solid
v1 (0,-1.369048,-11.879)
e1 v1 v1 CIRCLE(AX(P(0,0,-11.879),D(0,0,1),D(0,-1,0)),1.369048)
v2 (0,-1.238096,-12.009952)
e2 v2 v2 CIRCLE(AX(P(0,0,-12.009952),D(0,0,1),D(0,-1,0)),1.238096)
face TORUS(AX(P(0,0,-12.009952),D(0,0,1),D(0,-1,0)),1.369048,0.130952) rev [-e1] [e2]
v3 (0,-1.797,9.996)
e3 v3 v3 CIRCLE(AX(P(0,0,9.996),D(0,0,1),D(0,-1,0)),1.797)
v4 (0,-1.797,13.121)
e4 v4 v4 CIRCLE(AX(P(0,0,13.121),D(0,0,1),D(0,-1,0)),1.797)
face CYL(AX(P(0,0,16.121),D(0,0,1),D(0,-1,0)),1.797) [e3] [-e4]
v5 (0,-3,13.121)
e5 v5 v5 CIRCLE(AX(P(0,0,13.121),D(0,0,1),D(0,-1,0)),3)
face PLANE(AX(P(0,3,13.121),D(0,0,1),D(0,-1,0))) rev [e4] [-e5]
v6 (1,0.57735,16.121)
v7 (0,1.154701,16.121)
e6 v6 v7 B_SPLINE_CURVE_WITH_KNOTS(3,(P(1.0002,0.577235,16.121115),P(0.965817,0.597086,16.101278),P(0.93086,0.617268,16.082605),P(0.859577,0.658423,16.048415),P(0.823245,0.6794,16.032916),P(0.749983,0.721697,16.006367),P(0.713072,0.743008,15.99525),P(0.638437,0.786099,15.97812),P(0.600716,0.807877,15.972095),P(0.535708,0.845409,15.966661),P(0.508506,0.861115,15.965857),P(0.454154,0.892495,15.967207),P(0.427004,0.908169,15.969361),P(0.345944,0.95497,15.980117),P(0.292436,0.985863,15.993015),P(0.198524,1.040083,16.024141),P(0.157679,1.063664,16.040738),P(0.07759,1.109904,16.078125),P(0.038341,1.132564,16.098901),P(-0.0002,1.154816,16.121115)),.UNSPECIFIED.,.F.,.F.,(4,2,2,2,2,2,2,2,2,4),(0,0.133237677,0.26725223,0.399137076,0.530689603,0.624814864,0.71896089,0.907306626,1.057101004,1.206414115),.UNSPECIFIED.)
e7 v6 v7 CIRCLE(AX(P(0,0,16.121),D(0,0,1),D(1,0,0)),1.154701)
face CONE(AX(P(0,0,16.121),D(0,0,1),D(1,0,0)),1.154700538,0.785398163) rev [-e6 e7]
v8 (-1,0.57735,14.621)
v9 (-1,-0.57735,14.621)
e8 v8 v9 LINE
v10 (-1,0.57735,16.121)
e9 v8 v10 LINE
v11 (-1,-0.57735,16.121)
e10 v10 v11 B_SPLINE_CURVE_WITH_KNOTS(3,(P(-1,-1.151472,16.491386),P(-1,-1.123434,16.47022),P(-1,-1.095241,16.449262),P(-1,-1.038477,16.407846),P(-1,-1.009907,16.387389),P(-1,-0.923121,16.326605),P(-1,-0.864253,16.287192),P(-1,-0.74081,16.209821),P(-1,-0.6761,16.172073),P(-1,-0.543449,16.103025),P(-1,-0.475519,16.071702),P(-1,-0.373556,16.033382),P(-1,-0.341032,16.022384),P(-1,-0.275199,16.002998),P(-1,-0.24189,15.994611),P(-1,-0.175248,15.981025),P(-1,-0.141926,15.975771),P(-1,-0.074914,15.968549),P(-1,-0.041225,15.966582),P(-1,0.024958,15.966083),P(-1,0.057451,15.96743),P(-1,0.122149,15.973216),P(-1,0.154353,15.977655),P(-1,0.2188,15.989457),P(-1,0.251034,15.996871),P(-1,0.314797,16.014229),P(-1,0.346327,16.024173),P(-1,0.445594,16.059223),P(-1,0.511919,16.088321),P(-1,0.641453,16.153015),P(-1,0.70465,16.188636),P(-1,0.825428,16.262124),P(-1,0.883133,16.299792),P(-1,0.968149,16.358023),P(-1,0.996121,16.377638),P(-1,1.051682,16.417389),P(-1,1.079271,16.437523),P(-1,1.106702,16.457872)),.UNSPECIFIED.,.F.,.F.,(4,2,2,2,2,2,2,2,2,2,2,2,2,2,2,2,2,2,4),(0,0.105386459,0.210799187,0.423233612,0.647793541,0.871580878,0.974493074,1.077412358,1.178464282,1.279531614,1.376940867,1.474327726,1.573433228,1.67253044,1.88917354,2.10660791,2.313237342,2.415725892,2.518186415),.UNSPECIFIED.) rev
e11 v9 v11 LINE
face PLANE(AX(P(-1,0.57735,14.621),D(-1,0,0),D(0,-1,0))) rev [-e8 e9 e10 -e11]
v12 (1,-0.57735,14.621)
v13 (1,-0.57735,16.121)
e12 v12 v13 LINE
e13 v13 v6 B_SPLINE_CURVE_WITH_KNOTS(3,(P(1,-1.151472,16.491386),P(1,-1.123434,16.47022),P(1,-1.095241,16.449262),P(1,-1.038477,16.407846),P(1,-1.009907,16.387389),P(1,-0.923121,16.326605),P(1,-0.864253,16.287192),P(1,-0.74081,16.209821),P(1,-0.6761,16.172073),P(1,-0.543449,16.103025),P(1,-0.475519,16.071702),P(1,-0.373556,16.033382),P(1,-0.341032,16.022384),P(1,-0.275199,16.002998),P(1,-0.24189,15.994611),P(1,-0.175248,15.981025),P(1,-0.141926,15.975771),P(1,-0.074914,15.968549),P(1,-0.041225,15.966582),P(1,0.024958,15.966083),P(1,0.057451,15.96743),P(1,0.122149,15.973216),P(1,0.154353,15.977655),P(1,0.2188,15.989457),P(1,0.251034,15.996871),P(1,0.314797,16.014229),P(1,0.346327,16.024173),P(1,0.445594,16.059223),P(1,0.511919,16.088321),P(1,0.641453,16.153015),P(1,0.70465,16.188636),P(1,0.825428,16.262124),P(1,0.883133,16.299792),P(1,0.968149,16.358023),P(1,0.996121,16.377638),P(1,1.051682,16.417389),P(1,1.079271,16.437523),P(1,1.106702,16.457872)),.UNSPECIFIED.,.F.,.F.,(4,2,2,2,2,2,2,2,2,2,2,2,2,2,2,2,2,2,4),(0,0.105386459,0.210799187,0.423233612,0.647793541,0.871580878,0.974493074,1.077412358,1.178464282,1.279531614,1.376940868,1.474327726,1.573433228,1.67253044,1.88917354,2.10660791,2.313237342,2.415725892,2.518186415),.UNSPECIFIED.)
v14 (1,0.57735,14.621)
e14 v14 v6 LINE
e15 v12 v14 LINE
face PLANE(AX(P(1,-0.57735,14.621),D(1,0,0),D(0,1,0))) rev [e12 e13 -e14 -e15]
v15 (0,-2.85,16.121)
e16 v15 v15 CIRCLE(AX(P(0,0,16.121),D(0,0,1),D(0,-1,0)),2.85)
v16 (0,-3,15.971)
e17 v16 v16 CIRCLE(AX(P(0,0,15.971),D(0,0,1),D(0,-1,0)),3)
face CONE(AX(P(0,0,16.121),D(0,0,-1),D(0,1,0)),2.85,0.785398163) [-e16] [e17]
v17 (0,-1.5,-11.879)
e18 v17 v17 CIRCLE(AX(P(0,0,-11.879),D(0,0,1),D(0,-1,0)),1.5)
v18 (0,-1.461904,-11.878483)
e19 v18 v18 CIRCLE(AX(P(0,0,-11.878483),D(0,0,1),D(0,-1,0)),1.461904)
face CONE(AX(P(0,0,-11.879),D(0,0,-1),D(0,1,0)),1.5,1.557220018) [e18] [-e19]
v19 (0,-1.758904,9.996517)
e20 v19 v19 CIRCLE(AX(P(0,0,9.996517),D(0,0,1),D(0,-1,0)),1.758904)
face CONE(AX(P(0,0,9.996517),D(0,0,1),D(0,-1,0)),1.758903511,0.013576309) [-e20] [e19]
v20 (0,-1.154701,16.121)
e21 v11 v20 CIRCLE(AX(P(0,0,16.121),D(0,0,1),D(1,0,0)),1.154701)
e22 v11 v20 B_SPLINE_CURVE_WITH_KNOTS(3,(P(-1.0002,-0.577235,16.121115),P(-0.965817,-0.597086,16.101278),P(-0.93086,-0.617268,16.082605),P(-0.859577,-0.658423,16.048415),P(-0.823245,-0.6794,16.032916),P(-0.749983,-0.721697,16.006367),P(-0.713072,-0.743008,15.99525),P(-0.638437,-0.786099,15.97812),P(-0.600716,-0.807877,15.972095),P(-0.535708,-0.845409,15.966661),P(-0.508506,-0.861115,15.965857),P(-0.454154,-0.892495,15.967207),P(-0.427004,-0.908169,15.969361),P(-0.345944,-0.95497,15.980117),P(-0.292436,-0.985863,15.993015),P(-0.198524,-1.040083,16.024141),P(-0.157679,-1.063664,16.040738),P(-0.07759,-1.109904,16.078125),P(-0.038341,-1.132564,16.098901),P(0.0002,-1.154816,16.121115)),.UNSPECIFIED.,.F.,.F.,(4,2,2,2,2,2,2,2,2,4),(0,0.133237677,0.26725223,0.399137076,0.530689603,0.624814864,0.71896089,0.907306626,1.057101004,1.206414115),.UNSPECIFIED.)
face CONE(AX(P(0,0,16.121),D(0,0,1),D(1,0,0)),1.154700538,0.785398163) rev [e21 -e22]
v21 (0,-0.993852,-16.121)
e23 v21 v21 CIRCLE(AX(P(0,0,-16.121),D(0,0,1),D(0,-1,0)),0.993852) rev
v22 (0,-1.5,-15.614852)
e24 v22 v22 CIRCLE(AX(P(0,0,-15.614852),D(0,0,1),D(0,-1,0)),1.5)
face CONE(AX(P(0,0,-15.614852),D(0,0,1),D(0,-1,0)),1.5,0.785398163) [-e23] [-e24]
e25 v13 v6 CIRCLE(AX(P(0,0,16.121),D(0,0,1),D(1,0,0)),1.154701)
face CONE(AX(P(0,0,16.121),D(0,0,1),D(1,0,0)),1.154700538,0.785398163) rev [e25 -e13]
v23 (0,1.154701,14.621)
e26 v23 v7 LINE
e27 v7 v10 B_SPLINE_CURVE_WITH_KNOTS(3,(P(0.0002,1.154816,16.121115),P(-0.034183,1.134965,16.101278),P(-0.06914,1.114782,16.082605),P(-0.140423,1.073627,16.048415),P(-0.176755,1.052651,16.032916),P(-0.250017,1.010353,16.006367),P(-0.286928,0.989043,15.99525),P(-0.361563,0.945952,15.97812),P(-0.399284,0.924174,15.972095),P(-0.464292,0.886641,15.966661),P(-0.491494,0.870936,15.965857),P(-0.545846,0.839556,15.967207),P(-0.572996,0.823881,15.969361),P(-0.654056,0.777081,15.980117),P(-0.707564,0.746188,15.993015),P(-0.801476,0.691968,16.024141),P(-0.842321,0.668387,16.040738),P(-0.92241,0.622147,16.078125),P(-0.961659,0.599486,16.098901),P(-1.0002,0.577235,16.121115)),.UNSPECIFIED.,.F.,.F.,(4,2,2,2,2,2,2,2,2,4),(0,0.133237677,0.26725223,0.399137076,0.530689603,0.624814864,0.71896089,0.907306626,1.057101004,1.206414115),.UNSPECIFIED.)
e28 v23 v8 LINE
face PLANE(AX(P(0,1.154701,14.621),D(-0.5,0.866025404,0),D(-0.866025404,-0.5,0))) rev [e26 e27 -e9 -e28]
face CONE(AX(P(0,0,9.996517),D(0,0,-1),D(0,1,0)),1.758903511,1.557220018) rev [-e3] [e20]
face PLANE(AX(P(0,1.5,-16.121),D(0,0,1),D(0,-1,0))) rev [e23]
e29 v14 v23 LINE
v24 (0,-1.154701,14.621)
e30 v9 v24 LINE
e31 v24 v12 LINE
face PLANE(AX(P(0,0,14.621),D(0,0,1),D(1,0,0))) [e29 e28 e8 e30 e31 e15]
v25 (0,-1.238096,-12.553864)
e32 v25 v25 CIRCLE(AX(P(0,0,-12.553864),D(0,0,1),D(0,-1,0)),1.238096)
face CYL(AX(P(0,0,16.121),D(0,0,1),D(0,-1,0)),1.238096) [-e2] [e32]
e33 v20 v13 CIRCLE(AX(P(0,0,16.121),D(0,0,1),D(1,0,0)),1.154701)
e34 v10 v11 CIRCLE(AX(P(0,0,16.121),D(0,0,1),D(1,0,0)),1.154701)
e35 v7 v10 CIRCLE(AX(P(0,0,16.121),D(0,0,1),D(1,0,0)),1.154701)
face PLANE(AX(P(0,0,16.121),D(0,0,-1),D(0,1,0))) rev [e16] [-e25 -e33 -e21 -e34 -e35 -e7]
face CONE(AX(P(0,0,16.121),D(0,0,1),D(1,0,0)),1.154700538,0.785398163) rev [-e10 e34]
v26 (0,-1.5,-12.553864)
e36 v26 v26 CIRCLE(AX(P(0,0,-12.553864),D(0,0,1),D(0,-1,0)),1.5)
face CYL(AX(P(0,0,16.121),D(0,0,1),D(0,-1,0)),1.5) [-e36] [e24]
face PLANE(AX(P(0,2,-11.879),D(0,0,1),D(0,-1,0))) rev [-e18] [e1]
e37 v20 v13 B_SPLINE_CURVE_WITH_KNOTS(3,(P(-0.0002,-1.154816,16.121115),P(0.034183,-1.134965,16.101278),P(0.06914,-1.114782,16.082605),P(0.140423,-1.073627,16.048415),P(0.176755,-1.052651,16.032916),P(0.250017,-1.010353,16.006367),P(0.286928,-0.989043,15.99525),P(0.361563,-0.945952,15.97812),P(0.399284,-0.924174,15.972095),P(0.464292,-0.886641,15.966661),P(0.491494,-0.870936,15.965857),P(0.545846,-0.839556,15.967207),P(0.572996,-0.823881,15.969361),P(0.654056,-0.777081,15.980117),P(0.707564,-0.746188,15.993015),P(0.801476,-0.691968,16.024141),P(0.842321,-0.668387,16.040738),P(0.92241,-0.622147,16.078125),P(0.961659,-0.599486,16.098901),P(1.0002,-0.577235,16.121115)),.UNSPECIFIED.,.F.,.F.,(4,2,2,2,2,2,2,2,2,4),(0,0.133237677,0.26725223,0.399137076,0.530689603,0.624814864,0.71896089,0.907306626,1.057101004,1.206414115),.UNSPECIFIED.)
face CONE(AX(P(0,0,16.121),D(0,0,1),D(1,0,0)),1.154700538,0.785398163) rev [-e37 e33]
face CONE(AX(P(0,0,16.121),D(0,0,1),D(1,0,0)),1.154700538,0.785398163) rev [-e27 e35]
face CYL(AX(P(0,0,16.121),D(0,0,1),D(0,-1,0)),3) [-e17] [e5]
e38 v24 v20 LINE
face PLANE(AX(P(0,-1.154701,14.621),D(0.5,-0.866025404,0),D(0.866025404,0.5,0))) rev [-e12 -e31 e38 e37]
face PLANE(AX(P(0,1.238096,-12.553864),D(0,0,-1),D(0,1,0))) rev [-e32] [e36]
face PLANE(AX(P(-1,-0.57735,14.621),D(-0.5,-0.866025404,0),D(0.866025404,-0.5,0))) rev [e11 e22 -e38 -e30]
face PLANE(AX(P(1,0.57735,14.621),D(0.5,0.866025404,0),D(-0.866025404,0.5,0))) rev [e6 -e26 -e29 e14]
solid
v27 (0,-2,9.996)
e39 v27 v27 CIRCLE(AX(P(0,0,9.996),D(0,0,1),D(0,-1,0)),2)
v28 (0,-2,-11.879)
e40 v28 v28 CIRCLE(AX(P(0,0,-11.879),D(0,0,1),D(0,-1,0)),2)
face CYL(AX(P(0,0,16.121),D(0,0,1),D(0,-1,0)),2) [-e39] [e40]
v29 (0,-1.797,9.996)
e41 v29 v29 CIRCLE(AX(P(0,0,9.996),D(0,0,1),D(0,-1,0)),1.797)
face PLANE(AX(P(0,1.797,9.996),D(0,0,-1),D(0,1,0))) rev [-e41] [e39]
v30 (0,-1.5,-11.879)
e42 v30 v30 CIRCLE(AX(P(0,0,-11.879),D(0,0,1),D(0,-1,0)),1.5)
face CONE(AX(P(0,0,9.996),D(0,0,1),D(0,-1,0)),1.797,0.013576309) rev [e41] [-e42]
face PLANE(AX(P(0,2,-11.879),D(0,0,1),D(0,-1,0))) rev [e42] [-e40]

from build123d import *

# Parameters (mm, degrees)
CUT_EXTRUDE1_START = 16.121
CUT_EXTRUDE1_DEPTH = 1.5
CHAMFER2_SIZE      = 0.506148016


# Read off the part's stored shape, not the designer's step: Cut-Revolve-Thin1
with BuildPart() as part:
    # Sketch3 → Revolve1 (revolve)
    with BuildSketch(Plane(origin=(0, 0, 0), x_dir=(0, 0, -1), z_dir=(1, 0, 0)), mode=Mode.PRIVATE) as revolve1_sk:
        with BuildLine():
            Line((-16.121, 0), (-16.121, 2.805))
            Line((-16.121, 2.805), (-16.121, 3))
            Line((-16.121, 3), (-13.316, 3))
            Line((-13.316, 3), (-13.121, 3))
            Line((-13.121, 3), (-13.121, 1.797))
            Line((-13.121, 1.797), (-9.996, 1.797))
            Line((-9.996, 1.797), (-9.996, 2))
            Line((-9.996, 2), (11.879, 2))
            Line((11.879, 2), (11.879, 1.36904775))
            ThreePointArc((11.879, 1.36904775), (11.917355026, 1.276450526), (12.00995225, 1.2380955))
            Line((12.00995225, 1.2380955), (12.553864022, 1.2380955))
            Line((12.553864022, 1.2380955), (12.553864022, 1.5))
            Line((12.553864022, 1.5), (15.746, 1.5))
            Line((15.746, 1.5), (16.121, 1.5))
            Line((16.121, 1.5), (16.121, 0))
            Line((16.121, 0), (-16.121, 0))
        make_face()
    revolve(revolve1_sk.sketch.rotate(Axis((0, 0, 16.121), (0, 0, -1)), 180), axis=Axis((0, 0, 16.121), (0, 0, -1)))

    # Cut-Revolve-Thin1 outline → Cut-Revolve-Thin1 (revolve, cut)
    with BuildSketch(Plane.XZ):
        Polygon((1.758903511, 9.996517241), (1.461903511, -11.878482759), (1.5, -11.879), (1.797, 9.996), align=None)
    revolve(axis=Axis((0, 0, 0), (0, 0, 1)), mode=Mode.SUBTRACT)

    # Sketch4 → Cut-Extrude1 (cut)
    with BuildSketch(Plane.XY.offset(CUT_EXTRUDE1_START)):
        Polygon((0, 1.154700538), (-1, 0.577350269), (-1, -0.577350269), (0, -1.154700538), (1, -0.577350269), (1, 0.577350269), align=None)
    extrude(amount=-CUT_EXTRUDE1_DEPTH, mode=Mode.SUBTRACT)

    # Cut-Extrude2 cone 1 section (through the dimple's axis) → Cut-Extrude2 (revolve, cut)
    with BuildSketch(Plane(origin=(0, 0, 16.121), x_dir=(0, -1, 0), z_dir=(1, 0, 0))):
        Polygon((0, 0), (1.154700538, 0), (0, 1.154700538), align=None)
    revolve(axis=Axis((0, 0, 16.121), (0, 0, -1)), mode=Mode.SUBTRACT)

    # Chamfer2
    chamfer2_edges = [part.edges().sort_by_distance(p)[0] for p in [
        (0, 1.5, -16.121),
    ]]
    chamfer(chamfer2_edges, length=CHAMFER2_SIZE)

    # Sketch10 → Cut-Revolve2 (revolve, cut)
    with BuildSketch(Plane(origin=(0, 0, 0), x_dir=(0, 0, -1), z_dir=(1, 0, 0)), mode=Mode.PRIVATE) as cut_revolve2_sk:
        Polygon((-16.121, 2.85), (-15.971, 3), (-16.121, 3), align=None)
    revolve(cut_revolve2_sk.sketch.rotate(Axis((0, 0, 16.121), (0, 0, -1)), 180), axis=Axis((0, 0, 16.121), (0, 0, -1)), mode=Mode.SUBTRACT)


solid = part.part
